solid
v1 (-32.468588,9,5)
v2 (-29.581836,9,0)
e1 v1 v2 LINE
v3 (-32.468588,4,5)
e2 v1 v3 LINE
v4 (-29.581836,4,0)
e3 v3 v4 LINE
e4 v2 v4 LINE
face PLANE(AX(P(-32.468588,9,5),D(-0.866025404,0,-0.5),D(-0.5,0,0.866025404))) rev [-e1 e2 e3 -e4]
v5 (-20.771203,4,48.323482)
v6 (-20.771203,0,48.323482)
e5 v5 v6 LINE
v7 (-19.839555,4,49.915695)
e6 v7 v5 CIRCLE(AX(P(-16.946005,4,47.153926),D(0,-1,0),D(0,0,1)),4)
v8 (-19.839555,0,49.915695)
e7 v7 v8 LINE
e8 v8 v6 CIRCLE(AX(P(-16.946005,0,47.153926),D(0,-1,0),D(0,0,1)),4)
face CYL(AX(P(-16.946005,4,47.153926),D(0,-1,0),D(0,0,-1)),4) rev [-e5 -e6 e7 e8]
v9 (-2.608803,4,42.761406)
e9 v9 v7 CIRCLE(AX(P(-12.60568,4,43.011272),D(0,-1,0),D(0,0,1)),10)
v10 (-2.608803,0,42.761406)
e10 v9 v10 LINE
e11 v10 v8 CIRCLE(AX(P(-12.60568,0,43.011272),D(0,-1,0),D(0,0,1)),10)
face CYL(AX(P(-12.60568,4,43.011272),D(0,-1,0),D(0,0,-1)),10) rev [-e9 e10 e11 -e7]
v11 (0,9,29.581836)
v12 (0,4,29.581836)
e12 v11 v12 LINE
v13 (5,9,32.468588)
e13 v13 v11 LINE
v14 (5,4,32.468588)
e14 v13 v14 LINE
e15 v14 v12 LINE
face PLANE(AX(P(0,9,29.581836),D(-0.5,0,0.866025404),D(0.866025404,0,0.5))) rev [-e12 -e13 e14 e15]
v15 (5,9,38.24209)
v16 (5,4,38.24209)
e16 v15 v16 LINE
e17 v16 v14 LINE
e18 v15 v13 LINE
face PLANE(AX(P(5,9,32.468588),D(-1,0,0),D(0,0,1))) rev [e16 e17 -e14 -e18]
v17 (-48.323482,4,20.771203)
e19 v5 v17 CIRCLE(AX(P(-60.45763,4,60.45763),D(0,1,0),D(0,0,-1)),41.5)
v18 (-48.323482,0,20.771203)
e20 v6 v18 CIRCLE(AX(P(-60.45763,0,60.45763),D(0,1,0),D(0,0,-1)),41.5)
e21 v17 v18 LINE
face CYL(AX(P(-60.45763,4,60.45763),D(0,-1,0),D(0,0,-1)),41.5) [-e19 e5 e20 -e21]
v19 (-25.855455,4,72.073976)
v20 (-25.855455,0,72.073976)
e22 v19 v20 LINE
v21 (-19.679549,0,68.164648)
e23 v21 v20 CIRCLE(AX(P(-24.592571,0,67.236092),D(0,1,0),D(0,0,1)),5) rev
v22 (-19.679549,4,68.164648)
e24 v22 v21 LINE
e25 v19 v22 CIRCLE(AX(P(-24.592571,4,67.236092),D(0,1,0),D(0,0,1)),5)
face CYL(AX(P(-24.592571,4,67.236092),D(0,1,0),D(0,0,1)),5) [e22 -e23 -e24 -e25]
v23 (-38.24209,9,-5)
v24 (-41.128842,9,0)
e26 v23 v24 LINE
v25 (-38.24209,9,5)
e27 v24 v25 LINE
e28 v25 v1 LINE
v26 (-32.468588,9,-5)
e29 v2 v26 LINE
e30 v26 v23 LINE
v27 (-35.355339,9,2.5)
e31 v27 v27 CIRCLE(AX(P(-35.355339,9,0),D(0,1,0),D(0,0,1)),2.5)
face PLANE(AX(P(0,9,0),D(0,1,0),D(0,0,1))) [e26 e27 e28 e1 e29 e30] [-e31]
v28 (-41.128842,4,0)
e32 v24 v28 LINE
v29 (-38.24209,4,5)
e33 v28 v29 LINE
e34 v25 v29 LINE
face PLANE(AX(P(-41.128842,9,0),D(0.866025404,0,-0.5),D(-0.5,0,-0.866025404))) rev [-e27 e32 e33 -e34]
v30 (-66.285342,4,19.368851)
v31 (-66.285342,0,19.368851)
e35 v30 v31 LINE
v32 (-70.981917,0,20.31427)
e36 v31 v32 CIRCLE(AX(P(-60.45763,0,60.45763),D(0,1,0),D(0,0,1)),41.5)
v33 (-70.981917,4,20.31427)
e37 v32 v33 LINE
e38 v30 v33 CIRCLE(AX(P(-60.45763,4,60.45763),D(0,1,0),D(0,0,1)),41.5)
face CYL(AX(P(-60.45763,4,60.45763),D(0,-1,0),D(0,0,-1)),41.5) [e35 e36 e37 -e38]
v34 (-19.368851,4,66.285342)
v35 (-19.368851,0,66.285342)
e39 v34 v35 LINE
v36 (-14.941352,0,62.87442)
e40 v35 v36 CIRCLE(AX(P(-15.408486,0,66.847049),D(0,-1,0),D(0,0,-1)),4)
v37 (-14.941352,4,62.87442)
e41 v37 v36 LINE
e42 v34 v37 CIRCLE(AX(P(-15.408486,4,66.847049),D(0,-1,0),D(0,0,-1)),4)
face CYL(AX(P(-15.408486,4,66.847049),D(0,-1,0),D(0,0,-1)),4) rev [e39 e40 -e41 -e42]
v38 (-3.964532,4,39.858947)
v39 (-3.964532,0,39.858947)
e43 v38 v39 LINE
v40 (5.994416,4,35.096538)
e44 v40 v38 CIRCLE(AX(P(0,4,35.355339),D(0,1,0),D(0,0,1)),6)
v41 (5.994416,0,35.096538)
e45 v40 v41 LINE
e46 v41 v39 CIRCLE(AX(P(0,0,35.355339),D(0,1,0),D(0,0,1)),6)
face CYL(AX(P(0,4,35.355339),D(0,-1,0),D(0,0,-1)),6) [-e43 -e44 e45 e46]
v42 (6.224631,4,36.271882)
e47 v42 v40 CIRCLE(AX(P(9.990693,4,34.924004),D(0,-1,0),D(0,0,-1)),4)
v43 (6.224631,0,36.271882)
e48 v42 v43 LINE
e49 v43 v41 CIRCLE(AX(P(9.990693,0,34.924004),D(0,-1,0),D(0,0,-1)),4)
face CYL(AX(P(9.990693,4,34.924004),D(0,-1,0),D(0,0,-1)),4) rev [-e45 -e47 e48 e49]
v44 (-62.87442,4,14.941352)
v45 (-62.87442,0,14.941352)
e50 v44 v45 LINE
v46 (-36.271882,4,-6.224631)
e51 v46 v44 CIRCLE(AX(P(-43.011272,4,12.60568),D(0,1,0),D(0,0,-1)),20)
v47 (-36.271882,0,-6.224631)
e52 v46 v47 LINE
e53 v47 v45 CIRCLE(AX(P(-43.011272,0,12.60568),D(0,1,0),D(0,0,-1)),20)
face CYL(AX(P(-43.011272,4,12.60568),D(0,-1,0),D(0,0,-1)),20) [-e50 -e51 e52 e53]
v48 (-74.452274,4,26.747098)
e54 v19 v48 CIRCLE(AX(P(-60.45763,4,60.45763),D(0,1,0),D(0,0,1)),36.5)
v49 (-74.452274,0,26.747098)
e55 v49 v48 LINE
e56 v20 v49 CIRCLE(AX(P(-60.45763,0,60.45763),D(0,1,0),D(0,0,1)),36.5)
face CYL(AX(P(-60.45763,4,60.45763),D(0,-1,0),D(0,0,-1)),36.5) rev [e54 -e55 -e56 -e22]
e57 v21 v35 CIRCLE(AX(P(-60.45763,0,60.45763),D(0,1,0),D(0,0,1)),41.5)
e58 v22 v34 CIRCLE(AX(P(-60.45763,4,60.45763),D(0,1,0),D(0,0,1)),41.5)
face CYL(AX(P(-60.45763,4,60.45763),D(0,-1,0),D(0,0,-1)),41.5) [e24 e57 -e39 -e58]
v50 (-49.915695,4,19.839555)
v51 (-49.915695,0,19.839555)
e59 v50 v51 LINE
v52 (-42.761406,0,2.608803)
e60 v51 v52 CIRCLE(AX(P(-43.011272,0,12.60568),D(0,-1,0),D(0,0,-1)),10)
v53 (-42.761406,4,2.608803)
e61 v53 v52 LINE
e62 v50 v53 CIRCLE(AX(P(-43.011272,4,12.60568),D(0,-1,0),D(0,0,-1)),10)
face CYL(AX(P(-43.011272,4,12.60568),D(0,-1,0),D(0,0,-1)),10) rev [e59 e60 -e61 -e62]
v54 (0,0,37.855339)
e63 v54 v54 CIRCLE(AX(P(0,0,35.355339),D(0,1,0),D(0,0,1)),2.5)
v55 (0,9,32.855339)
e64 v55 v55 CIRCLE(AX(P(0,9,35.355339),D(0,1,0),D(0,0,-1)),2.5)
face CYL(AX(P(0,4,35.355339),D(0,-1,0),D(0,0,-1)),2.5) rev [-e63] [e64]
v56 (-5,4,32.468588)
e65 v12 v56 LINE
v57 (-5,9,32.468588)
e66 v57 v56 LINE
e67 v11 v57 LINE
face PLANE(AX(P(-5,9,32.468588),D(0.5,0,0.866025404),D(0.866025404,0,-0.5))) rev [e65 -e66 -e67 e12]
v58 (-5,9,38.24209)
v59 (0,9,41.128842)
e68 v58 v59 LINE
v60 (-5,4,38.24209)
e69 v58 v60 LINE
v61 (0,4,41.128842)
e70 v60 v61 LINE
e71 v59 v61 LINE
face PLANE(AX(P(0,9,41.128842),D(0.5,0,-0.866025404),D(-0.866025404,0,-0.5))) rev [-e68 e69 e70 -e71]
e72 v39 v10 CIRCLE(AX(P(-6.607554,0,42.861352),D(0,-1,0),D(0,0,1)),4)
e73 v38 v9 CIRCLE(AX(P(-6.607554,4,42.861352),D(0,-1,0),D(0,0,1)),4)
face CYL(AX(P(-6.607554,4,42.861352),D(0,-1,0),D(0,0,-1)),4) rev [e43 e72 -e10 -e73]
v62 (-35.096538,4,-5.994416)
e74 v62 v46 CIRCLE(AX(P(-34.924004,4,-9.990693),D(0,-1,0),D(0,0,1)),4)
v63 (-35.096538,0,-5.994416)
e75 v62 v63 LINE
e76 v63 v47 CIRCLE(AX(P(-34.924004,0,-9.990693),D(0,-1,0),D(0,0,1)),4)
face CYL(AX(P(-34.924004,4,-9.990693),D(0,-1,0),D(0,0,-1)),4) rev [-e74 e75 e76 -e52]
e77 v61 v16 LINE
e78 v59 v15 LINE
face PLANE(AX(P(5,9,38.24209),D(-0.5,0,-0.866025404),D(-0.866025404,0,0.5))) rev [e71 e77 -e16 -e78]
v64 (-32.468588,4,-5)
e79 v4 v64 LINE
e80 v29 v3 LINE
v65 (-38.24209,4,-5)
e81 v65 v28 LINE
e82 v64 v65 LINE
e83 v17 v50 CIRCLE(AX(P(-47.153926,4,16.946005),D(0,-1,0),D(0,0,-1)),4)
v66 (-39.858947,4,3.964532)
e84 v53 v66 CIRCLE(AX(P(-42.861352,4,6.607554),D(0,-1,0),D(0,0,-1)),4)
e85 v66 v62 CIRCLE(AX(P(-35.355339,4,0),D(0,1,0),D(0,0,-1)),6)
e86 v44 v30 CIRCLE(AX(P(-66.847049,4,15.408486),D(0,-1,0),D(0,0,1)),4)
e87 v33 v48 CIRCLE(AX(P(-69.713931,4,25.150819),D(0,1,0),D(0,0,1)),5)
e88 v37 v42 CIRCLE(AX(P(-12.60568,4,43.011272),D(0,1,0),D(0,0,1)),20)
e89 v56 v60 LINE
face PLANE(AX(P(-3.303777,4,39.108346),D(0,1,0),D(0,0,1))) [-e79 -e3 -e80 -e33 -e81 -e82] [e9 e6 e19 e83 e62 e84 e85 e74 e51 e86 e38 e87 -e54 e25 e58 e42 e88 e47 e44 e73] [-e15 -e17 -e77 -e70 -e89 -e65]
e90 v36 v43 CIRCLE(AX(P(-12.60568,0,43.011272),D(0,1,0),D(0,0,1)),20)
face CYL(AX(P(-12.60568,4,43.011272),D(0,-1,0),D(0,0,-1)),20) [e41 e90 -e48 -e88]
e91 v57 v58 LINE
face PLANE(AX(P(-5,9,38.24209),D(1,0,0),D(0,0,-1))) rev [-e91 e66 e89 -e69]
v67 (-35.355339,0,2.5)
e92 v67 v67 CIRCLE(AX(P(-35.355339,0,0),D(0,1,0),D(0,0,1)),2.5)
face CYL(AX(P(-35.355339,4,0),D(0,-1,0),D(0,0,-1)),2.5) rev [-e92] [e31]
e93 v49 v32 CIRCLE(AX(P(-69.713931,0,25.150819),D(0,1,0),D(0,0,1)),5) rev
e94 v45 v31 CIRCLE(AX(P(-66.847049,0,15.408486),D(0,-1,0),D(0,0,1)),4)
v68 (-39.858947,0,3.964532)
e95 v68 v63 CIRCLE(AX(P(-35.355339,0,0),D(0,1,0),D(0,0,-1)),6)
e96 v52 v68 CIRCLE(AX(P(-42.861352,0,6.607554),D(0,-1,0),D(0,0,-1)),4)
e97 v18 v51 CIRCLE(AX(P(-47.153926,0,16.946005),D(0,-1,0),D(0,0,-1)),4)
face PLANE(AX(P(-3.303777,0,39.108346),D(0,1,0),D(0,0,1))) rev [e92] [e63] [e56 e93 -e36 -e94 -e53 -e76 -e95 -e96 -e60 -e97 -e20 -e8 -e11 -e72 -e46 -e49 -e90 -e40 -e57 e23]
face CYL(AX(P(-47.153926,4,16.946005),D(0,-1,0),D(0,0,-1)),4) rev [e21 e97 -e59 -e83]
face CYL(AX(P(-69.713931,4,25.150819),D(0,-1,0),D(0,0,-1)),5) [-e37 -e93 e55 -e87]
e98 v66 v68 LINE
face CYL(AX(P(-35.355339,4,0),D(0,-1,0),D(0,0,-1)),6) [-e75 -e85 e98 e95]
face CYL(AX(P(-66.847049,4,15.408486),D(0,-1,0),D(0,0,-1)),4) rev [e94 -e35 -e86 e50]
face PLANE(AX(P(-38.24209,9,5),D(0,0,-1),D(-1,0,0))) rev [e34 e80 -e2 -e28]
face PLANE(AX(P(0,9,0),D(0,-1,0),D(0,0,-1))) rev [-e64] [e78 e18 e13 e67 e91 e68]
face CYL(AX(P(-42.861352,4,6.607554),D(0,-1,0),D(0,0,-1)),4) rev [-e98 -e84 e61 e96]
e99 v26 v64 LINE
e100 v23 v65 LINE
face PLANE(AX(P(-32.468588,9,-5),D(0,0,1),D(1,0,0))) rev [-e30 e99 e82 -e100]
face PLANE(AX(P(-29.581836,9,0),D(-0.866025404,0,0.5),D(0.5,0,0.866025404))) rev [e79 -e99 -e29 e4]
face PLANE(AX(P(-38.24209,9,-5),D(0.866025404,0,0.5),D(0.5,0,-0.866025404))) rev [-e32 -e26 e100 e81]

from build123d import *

# Parameters (mm, degrees)
SKETCH1_R           = 2.5
SKETCH1_R_2         = 36.5
BOSS_EXTRUDE1_DEPTH = 4
SKETCH2_R           = 2.5
BOSS_EXTRUDE2_DEPTH = 5
SKETCH3_R           = 64.411178088
CUT_EXTRUDE1_DEPTH  = 10
FILLET1_R           = 5


with BuildPart() as part:
    # Sketch1 → Boss-Extrude1 (new body)
    with BuildSketch(Plane(origin=(0, 0, 0), x_dir=(1, 0, 0), z_dir=(0, 1, 0))):
        with BuildLine():
            ThreePointArc((-35.096538253, 5.994415913), (-29.942413888, -2.588482391), (-39.858946955, -3.964532245))
            ThreePointArc((-39.858946955, -3.964532245), (-41.168529898, -2.983419005), (-42.761405669, -2.608802601))
            ThreePointArc((-42.761405669, -2.608802601), (-52.246827812, -8.771034491), (-49.915694824, -19.839555354))
            ThreePointArc((-49.915694824, -19.839555354), (-49.174030159, -20.398421652), (-48.323482114, -20.771203143))
            ThreePointArc((-48.323482114, -20.771203143), (-31.112698372, -31.112698372), (-20.771203143, -48.323482114))
            ThreePointArc((-20.771203143, -48.323482114), (-20.398421652, -49.174030159), (-19.839555354, -49.915694824))
            ThreePointArc((-19.839555354, -49.915694824), (-8.771034491, -52.246827812), (-2.608802601, -42.761405669))
            ThreePointArc((-2.608802601, -42.761405669), (-2.983419005, -41.168529898), (-3.964532245, -39.858946955))
            ThreePointArc((-3.964532245, -39.858946955), (-2.588482391, -29.942413888), (5.994415913, -35.096538253))
            ThreePointArc((5.994415913, -35.096538253), (6.065284008, -35.692875475), (6.224630915, -36.271882326))
            ThreePointArc((6.224630915, -36.271882326), (3.044943645, -55.463499369), (-14.941352097, -62.87441978))
            ThreePointArc((-14.941352097, -62.87441978), (-17.849646318, -63.67833691), (-19.368850678, -66.285342115))
            ThreePointArc((-19.368850678, -66.285342115), (-89.802561211, -89.802561211), (-66.285342115, -19.368850678))
            ThreePointArc((-66.285342115, -19.368850678), (-63.67833691, -17.849646318), (-62.87441978, -14.941352097))
            ThreePointArc((-62.87441978, -14.941352097), (-55.463499369, 3.044943645), (-36.271882326, 6.224630915))
            ThreePointArc((-36.271882326, 6.224630915), (-35.692875475, 6.065284008), (-35.096538253, 5.994415913))
        make_face()
        with Locations(Location((0, -35.355339059, 0), (0, 0, 270))):
            Circle(SKETCH1_R, mode=Mode.SUBTRACT)
        with Locations(Location((-35.355339059, 0, 0), (0, 0, 270))):
            Circle(SKETCH1_R, mode=Mode.SUBTRACT)
        with Locations(Location((-60.457629791, -60.457629791, 0), (0, 0, 270))):
            Circle(SKETCH1_R_2, mode=Mode.SUBTRACT)
    extrude(amount=BOSS_EXTRUDE1_DEPTH)

    # Sketch2 → Boss-Extrude2 (add)
    # profile 1 of 2: a face of its own
    with BuildSketch(Plane(origin=(0, 4, 0), x_dir=(1, 0, 0), z_dir=(0, 1, 0))):
        Polygon((-32.468587713, -5), (-29.581836367, 0), (-32.468587713, 5), (-38.242090405, 5), (-41.128841751, 0), (-38.242090405, -5), align=None)
        with Locations(Location((-35.355339059, 0, 0), (0, 0, 270))):
            Circle(SKETCH2_R, mode=Mode.SUBTRACT)
    # profile 2 of 2: a face of its own
    with BuildSketch(Plane(origin=(0, 4, 0), x_dir=(1, 0, 0), z_dir=(0, 1, 0))):
        Polygon((-5, -38.242090405), (-5, -32.468587713), (0, -29.581836367), (5, -32.468587713), (5, -38.242090405), (0, -41.128841751), align=None)
        with Locations(Location((0, -35.355339059, 0), (0, 0, 90))):
            Circle(SKETCH2_R, mode=Mode.SUBTRACT)
    extrude(amount=BOSS_EXTRUDE2_DEPTH)

    # Sketch3 → Cut-Extrude1 (cut)
    with BuildSketch(Plane(origin=(0, 4, 0), x_dir=(1, 0, 0), z_dir=(0, 1, 0))):
        with Locations((-87.790328178, -89.76214525)):
            Circle(SKETCH3_R)
    extrude(amount=-CUT_EXTRUDE1_DEPTH, mode=Mode.SUBTRACT)

    # Fillet1
    # the kernel refuses this fillet: 5 mm, written as the material it takes off along each edge
    with BuildSketch(Plane(origin=(-82.88269404, 36.492109743, 25.538201196), x_dir=(0.9156666742355372, 0, -0.40193847998721216), z_dir=(0, -1, 0))) as fillet1_piece_1:
        with BuildLine():
            CenterArc((12.213901494, 4.938319673), FILLET1_R, 185.081491193, 93.927443362)
            ThreePointArc((7.233552845, 4.495457015), (3.691158281, 2.128042099), (0, 0))
            ThreePointArc((0, 0), (6.498421949, -0.511946714), (12.996843897, 0))
        make_face()
    extrude(amount=68.984219486, mode=Mode.SUBTRACT)
    with BuildSketch(Plane(origin=(-24.063187691, 36.492109743, 80.399911111), x_dir=(-0.2104426135040135, 0, -0.9776062123481011), z_dir=(0, -1, 0))) as fillet1_piece_2:
        with BuildLine():
            CenterArc((12.98043651, 2.252700357), FILLET1_R, 112.850896292, 93.927443362)
            ThreePointArc((11.038764851, 6.860293131), (5.249154934, 3.86496439), (0, 0))
            ThreePointArc((0, 0), (4.258327739, 0.140916633), (8.516655478, 0))
        make_face()
    extrude(amount=68.984219486, mode=Mode.SUBTRACT)


solid = part.part
